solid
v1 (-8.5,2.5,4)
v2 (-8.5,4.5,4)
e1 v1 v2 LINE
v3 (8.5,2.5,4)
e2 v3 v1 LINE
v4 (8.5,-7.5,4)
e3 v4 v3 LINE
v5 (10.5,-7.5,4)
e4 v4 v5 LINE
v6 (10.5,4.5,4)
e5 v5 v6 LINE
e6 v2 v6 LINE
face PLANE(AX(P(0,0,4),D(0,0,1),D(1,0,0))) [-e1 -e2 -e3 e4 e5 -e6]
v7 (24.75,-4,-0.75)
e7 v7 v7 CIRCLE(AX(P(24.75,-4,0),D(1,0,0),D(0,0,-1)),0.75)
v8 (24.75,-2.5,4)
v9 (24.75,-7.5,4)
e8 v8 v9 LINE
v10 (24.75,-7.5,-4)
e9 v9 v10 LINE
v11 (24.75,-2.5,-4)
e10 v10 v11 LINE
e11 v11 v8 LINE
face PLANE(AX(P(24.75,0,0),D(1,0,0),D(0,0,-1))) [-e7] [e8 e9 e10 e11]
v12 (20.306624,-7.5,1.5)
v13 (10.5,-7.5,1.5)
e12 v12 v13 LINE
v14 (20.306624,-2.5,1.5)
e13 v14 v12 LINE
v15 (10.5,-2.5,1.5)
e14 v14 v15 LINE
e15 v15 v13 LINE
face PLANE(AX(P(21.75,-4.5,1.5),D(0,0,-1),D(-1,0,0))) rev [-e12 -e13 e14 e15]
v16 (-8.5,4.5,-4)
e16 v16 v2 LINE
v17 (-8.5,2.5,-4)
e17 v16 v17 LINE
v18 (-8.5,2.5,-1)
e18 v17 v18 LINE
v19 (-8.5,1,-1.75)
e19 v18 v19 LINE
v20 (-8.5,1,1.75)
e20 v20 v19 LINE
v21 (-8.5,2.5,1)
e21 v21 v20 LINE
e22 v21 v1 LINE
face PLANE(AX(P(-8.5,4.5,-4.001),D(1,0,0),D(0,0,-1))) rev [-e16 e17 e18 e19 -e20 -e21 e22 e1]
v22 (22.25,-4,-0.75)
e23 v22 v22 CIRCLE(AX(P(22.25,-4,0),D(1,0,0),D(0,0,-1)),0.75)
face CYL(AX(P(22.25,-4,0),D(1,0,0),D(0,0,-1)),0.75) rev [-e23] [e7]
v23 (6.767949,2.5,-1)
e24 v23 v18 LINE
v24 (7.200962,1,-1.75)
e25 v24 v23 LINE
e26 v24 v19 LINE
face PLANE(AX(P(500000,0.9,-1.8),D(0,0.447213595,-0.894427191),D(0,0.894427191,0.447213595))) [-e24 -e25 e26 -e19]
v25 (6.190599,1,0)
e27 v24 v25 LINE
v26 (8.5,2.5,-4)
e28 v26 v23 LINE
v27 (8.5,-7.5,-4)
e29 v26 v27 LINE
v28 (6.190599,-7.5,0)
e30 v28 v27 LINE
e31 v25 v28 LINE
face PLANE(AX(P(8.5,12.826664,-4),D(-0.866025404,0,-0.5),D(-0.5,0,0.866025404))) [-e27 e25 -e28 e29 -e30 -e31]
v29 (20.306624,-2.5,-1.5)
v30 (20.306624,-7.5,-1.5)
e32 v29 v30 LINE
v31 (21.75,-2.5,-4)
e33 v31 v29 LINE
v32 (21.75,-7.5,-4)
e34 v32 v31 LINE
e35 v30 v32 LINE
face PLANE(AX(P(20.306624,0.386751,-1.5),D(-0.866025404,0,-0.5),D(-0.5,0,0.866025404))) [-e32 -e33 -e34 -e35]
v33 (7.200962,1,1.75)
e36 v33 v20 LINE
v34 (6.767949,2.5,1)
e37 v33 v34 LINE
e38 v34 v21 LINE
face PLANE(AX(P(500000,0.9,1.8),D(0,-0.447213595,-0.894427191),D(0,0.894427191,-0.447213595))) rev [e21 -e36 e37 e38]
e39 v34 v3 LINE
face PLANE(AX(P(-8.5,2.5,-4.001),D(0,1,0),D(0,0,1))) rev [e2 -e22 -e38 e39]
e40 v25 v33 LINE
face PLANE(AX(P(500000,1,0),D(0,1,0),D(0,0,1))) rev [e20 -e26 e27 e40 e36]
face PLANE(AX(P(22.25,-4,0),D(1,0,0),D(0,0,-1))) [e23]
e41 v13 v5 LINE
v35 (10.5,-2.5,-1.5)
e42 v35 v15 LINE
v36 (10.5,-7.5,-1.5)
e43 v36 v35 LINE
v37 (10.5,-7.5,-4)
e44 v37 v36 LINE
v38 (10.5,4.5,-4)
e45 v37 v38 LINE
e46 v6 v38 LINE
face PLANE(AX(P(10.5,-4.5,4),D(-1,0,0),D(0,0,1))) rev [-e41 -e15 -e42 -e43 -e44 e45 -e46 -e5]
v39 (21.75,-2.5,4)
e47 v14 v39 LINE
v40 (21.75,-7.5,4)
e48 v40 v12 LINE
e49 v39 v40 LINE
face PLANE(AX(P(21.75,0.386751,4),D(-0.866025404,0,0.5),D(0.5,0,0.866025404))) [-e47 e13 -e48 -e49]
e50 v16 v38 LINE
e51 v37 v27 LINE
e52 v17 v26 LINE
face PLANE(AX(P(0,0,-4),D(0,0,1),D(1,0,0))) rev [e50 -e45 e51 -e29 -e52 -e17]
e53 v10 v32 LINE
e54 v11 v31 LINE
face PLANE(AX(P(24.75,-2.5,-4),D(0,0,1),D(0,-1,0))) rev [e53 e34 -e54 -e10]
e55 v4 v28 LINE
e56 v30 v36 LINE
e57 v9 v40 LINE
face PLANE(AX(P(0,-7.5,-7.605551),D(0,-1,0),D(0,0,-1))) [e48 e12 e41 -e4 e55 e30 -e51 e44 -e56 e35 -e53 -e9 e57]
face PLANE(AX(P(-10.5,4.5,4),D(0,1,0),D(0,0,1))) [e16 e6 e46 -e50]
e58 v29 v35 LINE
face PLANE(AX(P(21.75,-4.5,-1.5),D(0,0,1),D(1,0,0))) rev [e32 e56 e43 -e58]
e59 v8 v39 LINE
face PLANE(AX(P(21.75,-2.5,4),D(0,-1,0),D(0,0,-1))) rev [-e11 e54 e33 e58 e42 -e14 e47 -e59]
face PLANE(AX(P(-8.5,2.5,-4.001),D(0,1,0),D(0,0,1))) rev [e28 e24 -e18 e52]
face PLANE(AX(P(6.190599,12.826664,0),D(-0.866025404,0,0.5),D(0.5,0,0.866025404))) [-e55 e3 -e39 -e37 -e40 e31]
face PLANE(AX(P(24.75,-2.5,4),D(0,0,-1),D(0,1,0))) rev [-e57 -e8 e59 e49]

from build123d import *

# Parameters (mm, degrees)
SKETCH1_W               = 21
SKETCH1_H               = 9
BOSS_EXTRUDE1_DEPTH     = 4
CUT_EXTRUDE1_REACH      = 15.946
SKETCH2_W               = 17
SKETCH2_H               = 7
CUT_EXTRUDE3_REACH      = 15.946
SKETCH5_W               = 2
SKETCH5_H               = 9
BOSS_EXTRUDE2_REACH     = 21.931
SKETCH9_W               = 2
SKETCH9_H               = 3
BOSS_EXTRUDE3_DEPTH     = 8
SKETCH11_W              = 3
SKETCH11_H              = 5
BOSS_EXTRUDE4_DEPTH     = 11.25
BOSS_EXTRUDE5_START     = -4
BOSS_EXTRUDE5_OUTLINE_W = 3
BOSS_EXTRUDE5_OUTLINE_H = 5
BOSS_EXTRUDE5_DEPTH     = 8
SKETCH13_R              = 0.75
CUT_EXTRUDE4_DEPTH      = 2.5
BOSS_EXTRUDE6_DEPTH     = 5
BOSS_EXTRUDE7_REACH     = 29.795


# Read off the part's stored shape, not the designer's step: Boss-Extrude5
with BuildPart() as part:
    # Sketch1 → Boss-Extrude1 (new, symmetric)
    with BuildSketch(Plane.XY):
        Rectangle(SKETCH1_W, SKETCH1_H)
    extrude(amount=BOSS_EXTRUDE1_DEPTH, both=True)

    # Sketch2 → Cut-Extrude1 (cut, up to next)
    with BuildSketch(Plane.XY.offset(4), mode=Mode.PRIVATE) as cut_extrude1_sk1:
        with Locations((0, -1)):
            Rectangle(SKETCH2_W, SKETCH2_H)
    cut_extrude1_tool1 = extrude(cut_extrude1_sk1.sketch, amount=-CUT_EXTRUDE1_REACH, mode=Mode.PRIVATE) & part.part
    add(cut_extrude1_tool1.solids().sort_by_distance((0, -1, 4))[0], mode=Mode.SUBTRACT)

    # Sketch5 → Cut-Extrude3 (cut, up to next)
    with BuildSketch(Plane.XY.offset(4), mode=Mode.PRIVATE) as cut_extrude3_sk1:
        with Locations((-9.5, 0)):
            Rectangle(SKETCH5_W, SKETCH5_H)
    cut_extrude3_tool1 = extrude(cut_extrude3_sk1.sketch, amount=-CUT_EXTRUDE3_REACH, mode=Mode.PRIVATE) & part.part
    add(cut_extrude3_tool1.solids().sort_by_distance((-9.5, 0, 4))[0], mode=Mode.SUBTRACT)

    # Sketch7 → Boss-Extrude2 (add, up to next)
    with BuildSketch(Plane.ZY.offset(8.5), mode=Mode.PRIVATE) as boss_extrude2_sk1:
        Polygon((1, 2.5), (-1, 2.5), (-1.75, 1), (1.75, 1), align=None)
    boss_extrude2_tool1 = extrude(boss_extrude2_sk1.sketch, amount=-BOSS_EXTRUDE2_REACH, mode=Mode.PRIVATE) - part.part
    add(boss_extrude2_tool1.solids().sort_by_distance((-8.5, 1.681818, 0))[0])

    # Sketch9 → Boss-Extrude3 (add)
    with BuildSketch(Plane.XY.offset(4)):
        with Locations((9.5, -6)):
            Rectangle(SKETCH9_W, SKETCH9_H)
    extrude(amount=-BOSS_EXTRUDE3_DEPTH)

    # Sketch11 → Boss-Extrude4 (add)
    with BuildSketch(Plane(origin=(10.5, 0, 0), x_dir=(0, 0, -1), z_dir=(1, 0, 0))):
        with Locations((0, -5)):
            Rectangle(SKETCH11_W, SKETCH11_H)
    extrude(amount=BOSS_EXTRUDE4_DEPTH)

    # Boss-Extrude5 outline → Boss-Extrude5 (add)
    with BuildSketch(Plane.XY.offset(BOSS_EXTRUDE5_START)):
        with Locations((23.25, -5)):
            Rectangle(BOSS_EXTRUDE5_OUTLINE_W, BOSS_EXTRUDE5_OUTLINE_H)
    extrude(amount=BOSS_EXTRUDE5_DEPTH)

    # Sketch13 → Cut-Extrude4 (cut)
    with BuildSketch(Plane(origin=(24.75, 0, 0), x_dir=(0, 0, -1), z_dir=(1, 0, 0))):
        with Locations((0, -4)):
            Circle(SKETCH13_R)
    extrude(amount=-CUT_EXTRUDE4_DEPTH, mode=Mode.SUBTRACT)

    # Sketch14 → Boss-Extrude6 (add)
    with BuildSketch(Plane.XZ.offset(7.5)):
        Polygon((21.75, 4), (20.306624327, 1.5), (21.75, 1.5), align=None)
        Polygon((21.75, -4), (21.75, -1.5), (20.306624327, -1.5), align=None)
    extrude(amount=-BOSS_EXTRUDE6_DEPTH)

    # Boss-Extrude7: up to this face of the body (flat: up to its plane)
    boss_extrude7_end = Plane(part.part.faces().sort_by_distance((1, 4.5, 0))[0])
    # Sketch15 → Boss-Extrude7 (add, up to the picked face)
    with BuildSketch(Plane.XZ.offset(7.5), mode=Mode.PRIVATE) as boss_extrude7_sk1:
        Polygon((8.5, 4), (8.5, -4), (6.190598923, 0), align=None)
    boss_extrude7_tool1 = split(extrude(boss_extrude7_sk1.sketch, amount=-BOSS_EXTRUDE7_REACH, mode=Mode.PRIVATE), bisect_by=boss_extrude7_end, keep=Keep.BOTH, mode=Mode.PRIVATE)
    add(boss_extrude7_tool1.solids().sort_by(Axis((7.7302, -7.5, 0), (0, 1, 0)))[0])


solid = part.part
